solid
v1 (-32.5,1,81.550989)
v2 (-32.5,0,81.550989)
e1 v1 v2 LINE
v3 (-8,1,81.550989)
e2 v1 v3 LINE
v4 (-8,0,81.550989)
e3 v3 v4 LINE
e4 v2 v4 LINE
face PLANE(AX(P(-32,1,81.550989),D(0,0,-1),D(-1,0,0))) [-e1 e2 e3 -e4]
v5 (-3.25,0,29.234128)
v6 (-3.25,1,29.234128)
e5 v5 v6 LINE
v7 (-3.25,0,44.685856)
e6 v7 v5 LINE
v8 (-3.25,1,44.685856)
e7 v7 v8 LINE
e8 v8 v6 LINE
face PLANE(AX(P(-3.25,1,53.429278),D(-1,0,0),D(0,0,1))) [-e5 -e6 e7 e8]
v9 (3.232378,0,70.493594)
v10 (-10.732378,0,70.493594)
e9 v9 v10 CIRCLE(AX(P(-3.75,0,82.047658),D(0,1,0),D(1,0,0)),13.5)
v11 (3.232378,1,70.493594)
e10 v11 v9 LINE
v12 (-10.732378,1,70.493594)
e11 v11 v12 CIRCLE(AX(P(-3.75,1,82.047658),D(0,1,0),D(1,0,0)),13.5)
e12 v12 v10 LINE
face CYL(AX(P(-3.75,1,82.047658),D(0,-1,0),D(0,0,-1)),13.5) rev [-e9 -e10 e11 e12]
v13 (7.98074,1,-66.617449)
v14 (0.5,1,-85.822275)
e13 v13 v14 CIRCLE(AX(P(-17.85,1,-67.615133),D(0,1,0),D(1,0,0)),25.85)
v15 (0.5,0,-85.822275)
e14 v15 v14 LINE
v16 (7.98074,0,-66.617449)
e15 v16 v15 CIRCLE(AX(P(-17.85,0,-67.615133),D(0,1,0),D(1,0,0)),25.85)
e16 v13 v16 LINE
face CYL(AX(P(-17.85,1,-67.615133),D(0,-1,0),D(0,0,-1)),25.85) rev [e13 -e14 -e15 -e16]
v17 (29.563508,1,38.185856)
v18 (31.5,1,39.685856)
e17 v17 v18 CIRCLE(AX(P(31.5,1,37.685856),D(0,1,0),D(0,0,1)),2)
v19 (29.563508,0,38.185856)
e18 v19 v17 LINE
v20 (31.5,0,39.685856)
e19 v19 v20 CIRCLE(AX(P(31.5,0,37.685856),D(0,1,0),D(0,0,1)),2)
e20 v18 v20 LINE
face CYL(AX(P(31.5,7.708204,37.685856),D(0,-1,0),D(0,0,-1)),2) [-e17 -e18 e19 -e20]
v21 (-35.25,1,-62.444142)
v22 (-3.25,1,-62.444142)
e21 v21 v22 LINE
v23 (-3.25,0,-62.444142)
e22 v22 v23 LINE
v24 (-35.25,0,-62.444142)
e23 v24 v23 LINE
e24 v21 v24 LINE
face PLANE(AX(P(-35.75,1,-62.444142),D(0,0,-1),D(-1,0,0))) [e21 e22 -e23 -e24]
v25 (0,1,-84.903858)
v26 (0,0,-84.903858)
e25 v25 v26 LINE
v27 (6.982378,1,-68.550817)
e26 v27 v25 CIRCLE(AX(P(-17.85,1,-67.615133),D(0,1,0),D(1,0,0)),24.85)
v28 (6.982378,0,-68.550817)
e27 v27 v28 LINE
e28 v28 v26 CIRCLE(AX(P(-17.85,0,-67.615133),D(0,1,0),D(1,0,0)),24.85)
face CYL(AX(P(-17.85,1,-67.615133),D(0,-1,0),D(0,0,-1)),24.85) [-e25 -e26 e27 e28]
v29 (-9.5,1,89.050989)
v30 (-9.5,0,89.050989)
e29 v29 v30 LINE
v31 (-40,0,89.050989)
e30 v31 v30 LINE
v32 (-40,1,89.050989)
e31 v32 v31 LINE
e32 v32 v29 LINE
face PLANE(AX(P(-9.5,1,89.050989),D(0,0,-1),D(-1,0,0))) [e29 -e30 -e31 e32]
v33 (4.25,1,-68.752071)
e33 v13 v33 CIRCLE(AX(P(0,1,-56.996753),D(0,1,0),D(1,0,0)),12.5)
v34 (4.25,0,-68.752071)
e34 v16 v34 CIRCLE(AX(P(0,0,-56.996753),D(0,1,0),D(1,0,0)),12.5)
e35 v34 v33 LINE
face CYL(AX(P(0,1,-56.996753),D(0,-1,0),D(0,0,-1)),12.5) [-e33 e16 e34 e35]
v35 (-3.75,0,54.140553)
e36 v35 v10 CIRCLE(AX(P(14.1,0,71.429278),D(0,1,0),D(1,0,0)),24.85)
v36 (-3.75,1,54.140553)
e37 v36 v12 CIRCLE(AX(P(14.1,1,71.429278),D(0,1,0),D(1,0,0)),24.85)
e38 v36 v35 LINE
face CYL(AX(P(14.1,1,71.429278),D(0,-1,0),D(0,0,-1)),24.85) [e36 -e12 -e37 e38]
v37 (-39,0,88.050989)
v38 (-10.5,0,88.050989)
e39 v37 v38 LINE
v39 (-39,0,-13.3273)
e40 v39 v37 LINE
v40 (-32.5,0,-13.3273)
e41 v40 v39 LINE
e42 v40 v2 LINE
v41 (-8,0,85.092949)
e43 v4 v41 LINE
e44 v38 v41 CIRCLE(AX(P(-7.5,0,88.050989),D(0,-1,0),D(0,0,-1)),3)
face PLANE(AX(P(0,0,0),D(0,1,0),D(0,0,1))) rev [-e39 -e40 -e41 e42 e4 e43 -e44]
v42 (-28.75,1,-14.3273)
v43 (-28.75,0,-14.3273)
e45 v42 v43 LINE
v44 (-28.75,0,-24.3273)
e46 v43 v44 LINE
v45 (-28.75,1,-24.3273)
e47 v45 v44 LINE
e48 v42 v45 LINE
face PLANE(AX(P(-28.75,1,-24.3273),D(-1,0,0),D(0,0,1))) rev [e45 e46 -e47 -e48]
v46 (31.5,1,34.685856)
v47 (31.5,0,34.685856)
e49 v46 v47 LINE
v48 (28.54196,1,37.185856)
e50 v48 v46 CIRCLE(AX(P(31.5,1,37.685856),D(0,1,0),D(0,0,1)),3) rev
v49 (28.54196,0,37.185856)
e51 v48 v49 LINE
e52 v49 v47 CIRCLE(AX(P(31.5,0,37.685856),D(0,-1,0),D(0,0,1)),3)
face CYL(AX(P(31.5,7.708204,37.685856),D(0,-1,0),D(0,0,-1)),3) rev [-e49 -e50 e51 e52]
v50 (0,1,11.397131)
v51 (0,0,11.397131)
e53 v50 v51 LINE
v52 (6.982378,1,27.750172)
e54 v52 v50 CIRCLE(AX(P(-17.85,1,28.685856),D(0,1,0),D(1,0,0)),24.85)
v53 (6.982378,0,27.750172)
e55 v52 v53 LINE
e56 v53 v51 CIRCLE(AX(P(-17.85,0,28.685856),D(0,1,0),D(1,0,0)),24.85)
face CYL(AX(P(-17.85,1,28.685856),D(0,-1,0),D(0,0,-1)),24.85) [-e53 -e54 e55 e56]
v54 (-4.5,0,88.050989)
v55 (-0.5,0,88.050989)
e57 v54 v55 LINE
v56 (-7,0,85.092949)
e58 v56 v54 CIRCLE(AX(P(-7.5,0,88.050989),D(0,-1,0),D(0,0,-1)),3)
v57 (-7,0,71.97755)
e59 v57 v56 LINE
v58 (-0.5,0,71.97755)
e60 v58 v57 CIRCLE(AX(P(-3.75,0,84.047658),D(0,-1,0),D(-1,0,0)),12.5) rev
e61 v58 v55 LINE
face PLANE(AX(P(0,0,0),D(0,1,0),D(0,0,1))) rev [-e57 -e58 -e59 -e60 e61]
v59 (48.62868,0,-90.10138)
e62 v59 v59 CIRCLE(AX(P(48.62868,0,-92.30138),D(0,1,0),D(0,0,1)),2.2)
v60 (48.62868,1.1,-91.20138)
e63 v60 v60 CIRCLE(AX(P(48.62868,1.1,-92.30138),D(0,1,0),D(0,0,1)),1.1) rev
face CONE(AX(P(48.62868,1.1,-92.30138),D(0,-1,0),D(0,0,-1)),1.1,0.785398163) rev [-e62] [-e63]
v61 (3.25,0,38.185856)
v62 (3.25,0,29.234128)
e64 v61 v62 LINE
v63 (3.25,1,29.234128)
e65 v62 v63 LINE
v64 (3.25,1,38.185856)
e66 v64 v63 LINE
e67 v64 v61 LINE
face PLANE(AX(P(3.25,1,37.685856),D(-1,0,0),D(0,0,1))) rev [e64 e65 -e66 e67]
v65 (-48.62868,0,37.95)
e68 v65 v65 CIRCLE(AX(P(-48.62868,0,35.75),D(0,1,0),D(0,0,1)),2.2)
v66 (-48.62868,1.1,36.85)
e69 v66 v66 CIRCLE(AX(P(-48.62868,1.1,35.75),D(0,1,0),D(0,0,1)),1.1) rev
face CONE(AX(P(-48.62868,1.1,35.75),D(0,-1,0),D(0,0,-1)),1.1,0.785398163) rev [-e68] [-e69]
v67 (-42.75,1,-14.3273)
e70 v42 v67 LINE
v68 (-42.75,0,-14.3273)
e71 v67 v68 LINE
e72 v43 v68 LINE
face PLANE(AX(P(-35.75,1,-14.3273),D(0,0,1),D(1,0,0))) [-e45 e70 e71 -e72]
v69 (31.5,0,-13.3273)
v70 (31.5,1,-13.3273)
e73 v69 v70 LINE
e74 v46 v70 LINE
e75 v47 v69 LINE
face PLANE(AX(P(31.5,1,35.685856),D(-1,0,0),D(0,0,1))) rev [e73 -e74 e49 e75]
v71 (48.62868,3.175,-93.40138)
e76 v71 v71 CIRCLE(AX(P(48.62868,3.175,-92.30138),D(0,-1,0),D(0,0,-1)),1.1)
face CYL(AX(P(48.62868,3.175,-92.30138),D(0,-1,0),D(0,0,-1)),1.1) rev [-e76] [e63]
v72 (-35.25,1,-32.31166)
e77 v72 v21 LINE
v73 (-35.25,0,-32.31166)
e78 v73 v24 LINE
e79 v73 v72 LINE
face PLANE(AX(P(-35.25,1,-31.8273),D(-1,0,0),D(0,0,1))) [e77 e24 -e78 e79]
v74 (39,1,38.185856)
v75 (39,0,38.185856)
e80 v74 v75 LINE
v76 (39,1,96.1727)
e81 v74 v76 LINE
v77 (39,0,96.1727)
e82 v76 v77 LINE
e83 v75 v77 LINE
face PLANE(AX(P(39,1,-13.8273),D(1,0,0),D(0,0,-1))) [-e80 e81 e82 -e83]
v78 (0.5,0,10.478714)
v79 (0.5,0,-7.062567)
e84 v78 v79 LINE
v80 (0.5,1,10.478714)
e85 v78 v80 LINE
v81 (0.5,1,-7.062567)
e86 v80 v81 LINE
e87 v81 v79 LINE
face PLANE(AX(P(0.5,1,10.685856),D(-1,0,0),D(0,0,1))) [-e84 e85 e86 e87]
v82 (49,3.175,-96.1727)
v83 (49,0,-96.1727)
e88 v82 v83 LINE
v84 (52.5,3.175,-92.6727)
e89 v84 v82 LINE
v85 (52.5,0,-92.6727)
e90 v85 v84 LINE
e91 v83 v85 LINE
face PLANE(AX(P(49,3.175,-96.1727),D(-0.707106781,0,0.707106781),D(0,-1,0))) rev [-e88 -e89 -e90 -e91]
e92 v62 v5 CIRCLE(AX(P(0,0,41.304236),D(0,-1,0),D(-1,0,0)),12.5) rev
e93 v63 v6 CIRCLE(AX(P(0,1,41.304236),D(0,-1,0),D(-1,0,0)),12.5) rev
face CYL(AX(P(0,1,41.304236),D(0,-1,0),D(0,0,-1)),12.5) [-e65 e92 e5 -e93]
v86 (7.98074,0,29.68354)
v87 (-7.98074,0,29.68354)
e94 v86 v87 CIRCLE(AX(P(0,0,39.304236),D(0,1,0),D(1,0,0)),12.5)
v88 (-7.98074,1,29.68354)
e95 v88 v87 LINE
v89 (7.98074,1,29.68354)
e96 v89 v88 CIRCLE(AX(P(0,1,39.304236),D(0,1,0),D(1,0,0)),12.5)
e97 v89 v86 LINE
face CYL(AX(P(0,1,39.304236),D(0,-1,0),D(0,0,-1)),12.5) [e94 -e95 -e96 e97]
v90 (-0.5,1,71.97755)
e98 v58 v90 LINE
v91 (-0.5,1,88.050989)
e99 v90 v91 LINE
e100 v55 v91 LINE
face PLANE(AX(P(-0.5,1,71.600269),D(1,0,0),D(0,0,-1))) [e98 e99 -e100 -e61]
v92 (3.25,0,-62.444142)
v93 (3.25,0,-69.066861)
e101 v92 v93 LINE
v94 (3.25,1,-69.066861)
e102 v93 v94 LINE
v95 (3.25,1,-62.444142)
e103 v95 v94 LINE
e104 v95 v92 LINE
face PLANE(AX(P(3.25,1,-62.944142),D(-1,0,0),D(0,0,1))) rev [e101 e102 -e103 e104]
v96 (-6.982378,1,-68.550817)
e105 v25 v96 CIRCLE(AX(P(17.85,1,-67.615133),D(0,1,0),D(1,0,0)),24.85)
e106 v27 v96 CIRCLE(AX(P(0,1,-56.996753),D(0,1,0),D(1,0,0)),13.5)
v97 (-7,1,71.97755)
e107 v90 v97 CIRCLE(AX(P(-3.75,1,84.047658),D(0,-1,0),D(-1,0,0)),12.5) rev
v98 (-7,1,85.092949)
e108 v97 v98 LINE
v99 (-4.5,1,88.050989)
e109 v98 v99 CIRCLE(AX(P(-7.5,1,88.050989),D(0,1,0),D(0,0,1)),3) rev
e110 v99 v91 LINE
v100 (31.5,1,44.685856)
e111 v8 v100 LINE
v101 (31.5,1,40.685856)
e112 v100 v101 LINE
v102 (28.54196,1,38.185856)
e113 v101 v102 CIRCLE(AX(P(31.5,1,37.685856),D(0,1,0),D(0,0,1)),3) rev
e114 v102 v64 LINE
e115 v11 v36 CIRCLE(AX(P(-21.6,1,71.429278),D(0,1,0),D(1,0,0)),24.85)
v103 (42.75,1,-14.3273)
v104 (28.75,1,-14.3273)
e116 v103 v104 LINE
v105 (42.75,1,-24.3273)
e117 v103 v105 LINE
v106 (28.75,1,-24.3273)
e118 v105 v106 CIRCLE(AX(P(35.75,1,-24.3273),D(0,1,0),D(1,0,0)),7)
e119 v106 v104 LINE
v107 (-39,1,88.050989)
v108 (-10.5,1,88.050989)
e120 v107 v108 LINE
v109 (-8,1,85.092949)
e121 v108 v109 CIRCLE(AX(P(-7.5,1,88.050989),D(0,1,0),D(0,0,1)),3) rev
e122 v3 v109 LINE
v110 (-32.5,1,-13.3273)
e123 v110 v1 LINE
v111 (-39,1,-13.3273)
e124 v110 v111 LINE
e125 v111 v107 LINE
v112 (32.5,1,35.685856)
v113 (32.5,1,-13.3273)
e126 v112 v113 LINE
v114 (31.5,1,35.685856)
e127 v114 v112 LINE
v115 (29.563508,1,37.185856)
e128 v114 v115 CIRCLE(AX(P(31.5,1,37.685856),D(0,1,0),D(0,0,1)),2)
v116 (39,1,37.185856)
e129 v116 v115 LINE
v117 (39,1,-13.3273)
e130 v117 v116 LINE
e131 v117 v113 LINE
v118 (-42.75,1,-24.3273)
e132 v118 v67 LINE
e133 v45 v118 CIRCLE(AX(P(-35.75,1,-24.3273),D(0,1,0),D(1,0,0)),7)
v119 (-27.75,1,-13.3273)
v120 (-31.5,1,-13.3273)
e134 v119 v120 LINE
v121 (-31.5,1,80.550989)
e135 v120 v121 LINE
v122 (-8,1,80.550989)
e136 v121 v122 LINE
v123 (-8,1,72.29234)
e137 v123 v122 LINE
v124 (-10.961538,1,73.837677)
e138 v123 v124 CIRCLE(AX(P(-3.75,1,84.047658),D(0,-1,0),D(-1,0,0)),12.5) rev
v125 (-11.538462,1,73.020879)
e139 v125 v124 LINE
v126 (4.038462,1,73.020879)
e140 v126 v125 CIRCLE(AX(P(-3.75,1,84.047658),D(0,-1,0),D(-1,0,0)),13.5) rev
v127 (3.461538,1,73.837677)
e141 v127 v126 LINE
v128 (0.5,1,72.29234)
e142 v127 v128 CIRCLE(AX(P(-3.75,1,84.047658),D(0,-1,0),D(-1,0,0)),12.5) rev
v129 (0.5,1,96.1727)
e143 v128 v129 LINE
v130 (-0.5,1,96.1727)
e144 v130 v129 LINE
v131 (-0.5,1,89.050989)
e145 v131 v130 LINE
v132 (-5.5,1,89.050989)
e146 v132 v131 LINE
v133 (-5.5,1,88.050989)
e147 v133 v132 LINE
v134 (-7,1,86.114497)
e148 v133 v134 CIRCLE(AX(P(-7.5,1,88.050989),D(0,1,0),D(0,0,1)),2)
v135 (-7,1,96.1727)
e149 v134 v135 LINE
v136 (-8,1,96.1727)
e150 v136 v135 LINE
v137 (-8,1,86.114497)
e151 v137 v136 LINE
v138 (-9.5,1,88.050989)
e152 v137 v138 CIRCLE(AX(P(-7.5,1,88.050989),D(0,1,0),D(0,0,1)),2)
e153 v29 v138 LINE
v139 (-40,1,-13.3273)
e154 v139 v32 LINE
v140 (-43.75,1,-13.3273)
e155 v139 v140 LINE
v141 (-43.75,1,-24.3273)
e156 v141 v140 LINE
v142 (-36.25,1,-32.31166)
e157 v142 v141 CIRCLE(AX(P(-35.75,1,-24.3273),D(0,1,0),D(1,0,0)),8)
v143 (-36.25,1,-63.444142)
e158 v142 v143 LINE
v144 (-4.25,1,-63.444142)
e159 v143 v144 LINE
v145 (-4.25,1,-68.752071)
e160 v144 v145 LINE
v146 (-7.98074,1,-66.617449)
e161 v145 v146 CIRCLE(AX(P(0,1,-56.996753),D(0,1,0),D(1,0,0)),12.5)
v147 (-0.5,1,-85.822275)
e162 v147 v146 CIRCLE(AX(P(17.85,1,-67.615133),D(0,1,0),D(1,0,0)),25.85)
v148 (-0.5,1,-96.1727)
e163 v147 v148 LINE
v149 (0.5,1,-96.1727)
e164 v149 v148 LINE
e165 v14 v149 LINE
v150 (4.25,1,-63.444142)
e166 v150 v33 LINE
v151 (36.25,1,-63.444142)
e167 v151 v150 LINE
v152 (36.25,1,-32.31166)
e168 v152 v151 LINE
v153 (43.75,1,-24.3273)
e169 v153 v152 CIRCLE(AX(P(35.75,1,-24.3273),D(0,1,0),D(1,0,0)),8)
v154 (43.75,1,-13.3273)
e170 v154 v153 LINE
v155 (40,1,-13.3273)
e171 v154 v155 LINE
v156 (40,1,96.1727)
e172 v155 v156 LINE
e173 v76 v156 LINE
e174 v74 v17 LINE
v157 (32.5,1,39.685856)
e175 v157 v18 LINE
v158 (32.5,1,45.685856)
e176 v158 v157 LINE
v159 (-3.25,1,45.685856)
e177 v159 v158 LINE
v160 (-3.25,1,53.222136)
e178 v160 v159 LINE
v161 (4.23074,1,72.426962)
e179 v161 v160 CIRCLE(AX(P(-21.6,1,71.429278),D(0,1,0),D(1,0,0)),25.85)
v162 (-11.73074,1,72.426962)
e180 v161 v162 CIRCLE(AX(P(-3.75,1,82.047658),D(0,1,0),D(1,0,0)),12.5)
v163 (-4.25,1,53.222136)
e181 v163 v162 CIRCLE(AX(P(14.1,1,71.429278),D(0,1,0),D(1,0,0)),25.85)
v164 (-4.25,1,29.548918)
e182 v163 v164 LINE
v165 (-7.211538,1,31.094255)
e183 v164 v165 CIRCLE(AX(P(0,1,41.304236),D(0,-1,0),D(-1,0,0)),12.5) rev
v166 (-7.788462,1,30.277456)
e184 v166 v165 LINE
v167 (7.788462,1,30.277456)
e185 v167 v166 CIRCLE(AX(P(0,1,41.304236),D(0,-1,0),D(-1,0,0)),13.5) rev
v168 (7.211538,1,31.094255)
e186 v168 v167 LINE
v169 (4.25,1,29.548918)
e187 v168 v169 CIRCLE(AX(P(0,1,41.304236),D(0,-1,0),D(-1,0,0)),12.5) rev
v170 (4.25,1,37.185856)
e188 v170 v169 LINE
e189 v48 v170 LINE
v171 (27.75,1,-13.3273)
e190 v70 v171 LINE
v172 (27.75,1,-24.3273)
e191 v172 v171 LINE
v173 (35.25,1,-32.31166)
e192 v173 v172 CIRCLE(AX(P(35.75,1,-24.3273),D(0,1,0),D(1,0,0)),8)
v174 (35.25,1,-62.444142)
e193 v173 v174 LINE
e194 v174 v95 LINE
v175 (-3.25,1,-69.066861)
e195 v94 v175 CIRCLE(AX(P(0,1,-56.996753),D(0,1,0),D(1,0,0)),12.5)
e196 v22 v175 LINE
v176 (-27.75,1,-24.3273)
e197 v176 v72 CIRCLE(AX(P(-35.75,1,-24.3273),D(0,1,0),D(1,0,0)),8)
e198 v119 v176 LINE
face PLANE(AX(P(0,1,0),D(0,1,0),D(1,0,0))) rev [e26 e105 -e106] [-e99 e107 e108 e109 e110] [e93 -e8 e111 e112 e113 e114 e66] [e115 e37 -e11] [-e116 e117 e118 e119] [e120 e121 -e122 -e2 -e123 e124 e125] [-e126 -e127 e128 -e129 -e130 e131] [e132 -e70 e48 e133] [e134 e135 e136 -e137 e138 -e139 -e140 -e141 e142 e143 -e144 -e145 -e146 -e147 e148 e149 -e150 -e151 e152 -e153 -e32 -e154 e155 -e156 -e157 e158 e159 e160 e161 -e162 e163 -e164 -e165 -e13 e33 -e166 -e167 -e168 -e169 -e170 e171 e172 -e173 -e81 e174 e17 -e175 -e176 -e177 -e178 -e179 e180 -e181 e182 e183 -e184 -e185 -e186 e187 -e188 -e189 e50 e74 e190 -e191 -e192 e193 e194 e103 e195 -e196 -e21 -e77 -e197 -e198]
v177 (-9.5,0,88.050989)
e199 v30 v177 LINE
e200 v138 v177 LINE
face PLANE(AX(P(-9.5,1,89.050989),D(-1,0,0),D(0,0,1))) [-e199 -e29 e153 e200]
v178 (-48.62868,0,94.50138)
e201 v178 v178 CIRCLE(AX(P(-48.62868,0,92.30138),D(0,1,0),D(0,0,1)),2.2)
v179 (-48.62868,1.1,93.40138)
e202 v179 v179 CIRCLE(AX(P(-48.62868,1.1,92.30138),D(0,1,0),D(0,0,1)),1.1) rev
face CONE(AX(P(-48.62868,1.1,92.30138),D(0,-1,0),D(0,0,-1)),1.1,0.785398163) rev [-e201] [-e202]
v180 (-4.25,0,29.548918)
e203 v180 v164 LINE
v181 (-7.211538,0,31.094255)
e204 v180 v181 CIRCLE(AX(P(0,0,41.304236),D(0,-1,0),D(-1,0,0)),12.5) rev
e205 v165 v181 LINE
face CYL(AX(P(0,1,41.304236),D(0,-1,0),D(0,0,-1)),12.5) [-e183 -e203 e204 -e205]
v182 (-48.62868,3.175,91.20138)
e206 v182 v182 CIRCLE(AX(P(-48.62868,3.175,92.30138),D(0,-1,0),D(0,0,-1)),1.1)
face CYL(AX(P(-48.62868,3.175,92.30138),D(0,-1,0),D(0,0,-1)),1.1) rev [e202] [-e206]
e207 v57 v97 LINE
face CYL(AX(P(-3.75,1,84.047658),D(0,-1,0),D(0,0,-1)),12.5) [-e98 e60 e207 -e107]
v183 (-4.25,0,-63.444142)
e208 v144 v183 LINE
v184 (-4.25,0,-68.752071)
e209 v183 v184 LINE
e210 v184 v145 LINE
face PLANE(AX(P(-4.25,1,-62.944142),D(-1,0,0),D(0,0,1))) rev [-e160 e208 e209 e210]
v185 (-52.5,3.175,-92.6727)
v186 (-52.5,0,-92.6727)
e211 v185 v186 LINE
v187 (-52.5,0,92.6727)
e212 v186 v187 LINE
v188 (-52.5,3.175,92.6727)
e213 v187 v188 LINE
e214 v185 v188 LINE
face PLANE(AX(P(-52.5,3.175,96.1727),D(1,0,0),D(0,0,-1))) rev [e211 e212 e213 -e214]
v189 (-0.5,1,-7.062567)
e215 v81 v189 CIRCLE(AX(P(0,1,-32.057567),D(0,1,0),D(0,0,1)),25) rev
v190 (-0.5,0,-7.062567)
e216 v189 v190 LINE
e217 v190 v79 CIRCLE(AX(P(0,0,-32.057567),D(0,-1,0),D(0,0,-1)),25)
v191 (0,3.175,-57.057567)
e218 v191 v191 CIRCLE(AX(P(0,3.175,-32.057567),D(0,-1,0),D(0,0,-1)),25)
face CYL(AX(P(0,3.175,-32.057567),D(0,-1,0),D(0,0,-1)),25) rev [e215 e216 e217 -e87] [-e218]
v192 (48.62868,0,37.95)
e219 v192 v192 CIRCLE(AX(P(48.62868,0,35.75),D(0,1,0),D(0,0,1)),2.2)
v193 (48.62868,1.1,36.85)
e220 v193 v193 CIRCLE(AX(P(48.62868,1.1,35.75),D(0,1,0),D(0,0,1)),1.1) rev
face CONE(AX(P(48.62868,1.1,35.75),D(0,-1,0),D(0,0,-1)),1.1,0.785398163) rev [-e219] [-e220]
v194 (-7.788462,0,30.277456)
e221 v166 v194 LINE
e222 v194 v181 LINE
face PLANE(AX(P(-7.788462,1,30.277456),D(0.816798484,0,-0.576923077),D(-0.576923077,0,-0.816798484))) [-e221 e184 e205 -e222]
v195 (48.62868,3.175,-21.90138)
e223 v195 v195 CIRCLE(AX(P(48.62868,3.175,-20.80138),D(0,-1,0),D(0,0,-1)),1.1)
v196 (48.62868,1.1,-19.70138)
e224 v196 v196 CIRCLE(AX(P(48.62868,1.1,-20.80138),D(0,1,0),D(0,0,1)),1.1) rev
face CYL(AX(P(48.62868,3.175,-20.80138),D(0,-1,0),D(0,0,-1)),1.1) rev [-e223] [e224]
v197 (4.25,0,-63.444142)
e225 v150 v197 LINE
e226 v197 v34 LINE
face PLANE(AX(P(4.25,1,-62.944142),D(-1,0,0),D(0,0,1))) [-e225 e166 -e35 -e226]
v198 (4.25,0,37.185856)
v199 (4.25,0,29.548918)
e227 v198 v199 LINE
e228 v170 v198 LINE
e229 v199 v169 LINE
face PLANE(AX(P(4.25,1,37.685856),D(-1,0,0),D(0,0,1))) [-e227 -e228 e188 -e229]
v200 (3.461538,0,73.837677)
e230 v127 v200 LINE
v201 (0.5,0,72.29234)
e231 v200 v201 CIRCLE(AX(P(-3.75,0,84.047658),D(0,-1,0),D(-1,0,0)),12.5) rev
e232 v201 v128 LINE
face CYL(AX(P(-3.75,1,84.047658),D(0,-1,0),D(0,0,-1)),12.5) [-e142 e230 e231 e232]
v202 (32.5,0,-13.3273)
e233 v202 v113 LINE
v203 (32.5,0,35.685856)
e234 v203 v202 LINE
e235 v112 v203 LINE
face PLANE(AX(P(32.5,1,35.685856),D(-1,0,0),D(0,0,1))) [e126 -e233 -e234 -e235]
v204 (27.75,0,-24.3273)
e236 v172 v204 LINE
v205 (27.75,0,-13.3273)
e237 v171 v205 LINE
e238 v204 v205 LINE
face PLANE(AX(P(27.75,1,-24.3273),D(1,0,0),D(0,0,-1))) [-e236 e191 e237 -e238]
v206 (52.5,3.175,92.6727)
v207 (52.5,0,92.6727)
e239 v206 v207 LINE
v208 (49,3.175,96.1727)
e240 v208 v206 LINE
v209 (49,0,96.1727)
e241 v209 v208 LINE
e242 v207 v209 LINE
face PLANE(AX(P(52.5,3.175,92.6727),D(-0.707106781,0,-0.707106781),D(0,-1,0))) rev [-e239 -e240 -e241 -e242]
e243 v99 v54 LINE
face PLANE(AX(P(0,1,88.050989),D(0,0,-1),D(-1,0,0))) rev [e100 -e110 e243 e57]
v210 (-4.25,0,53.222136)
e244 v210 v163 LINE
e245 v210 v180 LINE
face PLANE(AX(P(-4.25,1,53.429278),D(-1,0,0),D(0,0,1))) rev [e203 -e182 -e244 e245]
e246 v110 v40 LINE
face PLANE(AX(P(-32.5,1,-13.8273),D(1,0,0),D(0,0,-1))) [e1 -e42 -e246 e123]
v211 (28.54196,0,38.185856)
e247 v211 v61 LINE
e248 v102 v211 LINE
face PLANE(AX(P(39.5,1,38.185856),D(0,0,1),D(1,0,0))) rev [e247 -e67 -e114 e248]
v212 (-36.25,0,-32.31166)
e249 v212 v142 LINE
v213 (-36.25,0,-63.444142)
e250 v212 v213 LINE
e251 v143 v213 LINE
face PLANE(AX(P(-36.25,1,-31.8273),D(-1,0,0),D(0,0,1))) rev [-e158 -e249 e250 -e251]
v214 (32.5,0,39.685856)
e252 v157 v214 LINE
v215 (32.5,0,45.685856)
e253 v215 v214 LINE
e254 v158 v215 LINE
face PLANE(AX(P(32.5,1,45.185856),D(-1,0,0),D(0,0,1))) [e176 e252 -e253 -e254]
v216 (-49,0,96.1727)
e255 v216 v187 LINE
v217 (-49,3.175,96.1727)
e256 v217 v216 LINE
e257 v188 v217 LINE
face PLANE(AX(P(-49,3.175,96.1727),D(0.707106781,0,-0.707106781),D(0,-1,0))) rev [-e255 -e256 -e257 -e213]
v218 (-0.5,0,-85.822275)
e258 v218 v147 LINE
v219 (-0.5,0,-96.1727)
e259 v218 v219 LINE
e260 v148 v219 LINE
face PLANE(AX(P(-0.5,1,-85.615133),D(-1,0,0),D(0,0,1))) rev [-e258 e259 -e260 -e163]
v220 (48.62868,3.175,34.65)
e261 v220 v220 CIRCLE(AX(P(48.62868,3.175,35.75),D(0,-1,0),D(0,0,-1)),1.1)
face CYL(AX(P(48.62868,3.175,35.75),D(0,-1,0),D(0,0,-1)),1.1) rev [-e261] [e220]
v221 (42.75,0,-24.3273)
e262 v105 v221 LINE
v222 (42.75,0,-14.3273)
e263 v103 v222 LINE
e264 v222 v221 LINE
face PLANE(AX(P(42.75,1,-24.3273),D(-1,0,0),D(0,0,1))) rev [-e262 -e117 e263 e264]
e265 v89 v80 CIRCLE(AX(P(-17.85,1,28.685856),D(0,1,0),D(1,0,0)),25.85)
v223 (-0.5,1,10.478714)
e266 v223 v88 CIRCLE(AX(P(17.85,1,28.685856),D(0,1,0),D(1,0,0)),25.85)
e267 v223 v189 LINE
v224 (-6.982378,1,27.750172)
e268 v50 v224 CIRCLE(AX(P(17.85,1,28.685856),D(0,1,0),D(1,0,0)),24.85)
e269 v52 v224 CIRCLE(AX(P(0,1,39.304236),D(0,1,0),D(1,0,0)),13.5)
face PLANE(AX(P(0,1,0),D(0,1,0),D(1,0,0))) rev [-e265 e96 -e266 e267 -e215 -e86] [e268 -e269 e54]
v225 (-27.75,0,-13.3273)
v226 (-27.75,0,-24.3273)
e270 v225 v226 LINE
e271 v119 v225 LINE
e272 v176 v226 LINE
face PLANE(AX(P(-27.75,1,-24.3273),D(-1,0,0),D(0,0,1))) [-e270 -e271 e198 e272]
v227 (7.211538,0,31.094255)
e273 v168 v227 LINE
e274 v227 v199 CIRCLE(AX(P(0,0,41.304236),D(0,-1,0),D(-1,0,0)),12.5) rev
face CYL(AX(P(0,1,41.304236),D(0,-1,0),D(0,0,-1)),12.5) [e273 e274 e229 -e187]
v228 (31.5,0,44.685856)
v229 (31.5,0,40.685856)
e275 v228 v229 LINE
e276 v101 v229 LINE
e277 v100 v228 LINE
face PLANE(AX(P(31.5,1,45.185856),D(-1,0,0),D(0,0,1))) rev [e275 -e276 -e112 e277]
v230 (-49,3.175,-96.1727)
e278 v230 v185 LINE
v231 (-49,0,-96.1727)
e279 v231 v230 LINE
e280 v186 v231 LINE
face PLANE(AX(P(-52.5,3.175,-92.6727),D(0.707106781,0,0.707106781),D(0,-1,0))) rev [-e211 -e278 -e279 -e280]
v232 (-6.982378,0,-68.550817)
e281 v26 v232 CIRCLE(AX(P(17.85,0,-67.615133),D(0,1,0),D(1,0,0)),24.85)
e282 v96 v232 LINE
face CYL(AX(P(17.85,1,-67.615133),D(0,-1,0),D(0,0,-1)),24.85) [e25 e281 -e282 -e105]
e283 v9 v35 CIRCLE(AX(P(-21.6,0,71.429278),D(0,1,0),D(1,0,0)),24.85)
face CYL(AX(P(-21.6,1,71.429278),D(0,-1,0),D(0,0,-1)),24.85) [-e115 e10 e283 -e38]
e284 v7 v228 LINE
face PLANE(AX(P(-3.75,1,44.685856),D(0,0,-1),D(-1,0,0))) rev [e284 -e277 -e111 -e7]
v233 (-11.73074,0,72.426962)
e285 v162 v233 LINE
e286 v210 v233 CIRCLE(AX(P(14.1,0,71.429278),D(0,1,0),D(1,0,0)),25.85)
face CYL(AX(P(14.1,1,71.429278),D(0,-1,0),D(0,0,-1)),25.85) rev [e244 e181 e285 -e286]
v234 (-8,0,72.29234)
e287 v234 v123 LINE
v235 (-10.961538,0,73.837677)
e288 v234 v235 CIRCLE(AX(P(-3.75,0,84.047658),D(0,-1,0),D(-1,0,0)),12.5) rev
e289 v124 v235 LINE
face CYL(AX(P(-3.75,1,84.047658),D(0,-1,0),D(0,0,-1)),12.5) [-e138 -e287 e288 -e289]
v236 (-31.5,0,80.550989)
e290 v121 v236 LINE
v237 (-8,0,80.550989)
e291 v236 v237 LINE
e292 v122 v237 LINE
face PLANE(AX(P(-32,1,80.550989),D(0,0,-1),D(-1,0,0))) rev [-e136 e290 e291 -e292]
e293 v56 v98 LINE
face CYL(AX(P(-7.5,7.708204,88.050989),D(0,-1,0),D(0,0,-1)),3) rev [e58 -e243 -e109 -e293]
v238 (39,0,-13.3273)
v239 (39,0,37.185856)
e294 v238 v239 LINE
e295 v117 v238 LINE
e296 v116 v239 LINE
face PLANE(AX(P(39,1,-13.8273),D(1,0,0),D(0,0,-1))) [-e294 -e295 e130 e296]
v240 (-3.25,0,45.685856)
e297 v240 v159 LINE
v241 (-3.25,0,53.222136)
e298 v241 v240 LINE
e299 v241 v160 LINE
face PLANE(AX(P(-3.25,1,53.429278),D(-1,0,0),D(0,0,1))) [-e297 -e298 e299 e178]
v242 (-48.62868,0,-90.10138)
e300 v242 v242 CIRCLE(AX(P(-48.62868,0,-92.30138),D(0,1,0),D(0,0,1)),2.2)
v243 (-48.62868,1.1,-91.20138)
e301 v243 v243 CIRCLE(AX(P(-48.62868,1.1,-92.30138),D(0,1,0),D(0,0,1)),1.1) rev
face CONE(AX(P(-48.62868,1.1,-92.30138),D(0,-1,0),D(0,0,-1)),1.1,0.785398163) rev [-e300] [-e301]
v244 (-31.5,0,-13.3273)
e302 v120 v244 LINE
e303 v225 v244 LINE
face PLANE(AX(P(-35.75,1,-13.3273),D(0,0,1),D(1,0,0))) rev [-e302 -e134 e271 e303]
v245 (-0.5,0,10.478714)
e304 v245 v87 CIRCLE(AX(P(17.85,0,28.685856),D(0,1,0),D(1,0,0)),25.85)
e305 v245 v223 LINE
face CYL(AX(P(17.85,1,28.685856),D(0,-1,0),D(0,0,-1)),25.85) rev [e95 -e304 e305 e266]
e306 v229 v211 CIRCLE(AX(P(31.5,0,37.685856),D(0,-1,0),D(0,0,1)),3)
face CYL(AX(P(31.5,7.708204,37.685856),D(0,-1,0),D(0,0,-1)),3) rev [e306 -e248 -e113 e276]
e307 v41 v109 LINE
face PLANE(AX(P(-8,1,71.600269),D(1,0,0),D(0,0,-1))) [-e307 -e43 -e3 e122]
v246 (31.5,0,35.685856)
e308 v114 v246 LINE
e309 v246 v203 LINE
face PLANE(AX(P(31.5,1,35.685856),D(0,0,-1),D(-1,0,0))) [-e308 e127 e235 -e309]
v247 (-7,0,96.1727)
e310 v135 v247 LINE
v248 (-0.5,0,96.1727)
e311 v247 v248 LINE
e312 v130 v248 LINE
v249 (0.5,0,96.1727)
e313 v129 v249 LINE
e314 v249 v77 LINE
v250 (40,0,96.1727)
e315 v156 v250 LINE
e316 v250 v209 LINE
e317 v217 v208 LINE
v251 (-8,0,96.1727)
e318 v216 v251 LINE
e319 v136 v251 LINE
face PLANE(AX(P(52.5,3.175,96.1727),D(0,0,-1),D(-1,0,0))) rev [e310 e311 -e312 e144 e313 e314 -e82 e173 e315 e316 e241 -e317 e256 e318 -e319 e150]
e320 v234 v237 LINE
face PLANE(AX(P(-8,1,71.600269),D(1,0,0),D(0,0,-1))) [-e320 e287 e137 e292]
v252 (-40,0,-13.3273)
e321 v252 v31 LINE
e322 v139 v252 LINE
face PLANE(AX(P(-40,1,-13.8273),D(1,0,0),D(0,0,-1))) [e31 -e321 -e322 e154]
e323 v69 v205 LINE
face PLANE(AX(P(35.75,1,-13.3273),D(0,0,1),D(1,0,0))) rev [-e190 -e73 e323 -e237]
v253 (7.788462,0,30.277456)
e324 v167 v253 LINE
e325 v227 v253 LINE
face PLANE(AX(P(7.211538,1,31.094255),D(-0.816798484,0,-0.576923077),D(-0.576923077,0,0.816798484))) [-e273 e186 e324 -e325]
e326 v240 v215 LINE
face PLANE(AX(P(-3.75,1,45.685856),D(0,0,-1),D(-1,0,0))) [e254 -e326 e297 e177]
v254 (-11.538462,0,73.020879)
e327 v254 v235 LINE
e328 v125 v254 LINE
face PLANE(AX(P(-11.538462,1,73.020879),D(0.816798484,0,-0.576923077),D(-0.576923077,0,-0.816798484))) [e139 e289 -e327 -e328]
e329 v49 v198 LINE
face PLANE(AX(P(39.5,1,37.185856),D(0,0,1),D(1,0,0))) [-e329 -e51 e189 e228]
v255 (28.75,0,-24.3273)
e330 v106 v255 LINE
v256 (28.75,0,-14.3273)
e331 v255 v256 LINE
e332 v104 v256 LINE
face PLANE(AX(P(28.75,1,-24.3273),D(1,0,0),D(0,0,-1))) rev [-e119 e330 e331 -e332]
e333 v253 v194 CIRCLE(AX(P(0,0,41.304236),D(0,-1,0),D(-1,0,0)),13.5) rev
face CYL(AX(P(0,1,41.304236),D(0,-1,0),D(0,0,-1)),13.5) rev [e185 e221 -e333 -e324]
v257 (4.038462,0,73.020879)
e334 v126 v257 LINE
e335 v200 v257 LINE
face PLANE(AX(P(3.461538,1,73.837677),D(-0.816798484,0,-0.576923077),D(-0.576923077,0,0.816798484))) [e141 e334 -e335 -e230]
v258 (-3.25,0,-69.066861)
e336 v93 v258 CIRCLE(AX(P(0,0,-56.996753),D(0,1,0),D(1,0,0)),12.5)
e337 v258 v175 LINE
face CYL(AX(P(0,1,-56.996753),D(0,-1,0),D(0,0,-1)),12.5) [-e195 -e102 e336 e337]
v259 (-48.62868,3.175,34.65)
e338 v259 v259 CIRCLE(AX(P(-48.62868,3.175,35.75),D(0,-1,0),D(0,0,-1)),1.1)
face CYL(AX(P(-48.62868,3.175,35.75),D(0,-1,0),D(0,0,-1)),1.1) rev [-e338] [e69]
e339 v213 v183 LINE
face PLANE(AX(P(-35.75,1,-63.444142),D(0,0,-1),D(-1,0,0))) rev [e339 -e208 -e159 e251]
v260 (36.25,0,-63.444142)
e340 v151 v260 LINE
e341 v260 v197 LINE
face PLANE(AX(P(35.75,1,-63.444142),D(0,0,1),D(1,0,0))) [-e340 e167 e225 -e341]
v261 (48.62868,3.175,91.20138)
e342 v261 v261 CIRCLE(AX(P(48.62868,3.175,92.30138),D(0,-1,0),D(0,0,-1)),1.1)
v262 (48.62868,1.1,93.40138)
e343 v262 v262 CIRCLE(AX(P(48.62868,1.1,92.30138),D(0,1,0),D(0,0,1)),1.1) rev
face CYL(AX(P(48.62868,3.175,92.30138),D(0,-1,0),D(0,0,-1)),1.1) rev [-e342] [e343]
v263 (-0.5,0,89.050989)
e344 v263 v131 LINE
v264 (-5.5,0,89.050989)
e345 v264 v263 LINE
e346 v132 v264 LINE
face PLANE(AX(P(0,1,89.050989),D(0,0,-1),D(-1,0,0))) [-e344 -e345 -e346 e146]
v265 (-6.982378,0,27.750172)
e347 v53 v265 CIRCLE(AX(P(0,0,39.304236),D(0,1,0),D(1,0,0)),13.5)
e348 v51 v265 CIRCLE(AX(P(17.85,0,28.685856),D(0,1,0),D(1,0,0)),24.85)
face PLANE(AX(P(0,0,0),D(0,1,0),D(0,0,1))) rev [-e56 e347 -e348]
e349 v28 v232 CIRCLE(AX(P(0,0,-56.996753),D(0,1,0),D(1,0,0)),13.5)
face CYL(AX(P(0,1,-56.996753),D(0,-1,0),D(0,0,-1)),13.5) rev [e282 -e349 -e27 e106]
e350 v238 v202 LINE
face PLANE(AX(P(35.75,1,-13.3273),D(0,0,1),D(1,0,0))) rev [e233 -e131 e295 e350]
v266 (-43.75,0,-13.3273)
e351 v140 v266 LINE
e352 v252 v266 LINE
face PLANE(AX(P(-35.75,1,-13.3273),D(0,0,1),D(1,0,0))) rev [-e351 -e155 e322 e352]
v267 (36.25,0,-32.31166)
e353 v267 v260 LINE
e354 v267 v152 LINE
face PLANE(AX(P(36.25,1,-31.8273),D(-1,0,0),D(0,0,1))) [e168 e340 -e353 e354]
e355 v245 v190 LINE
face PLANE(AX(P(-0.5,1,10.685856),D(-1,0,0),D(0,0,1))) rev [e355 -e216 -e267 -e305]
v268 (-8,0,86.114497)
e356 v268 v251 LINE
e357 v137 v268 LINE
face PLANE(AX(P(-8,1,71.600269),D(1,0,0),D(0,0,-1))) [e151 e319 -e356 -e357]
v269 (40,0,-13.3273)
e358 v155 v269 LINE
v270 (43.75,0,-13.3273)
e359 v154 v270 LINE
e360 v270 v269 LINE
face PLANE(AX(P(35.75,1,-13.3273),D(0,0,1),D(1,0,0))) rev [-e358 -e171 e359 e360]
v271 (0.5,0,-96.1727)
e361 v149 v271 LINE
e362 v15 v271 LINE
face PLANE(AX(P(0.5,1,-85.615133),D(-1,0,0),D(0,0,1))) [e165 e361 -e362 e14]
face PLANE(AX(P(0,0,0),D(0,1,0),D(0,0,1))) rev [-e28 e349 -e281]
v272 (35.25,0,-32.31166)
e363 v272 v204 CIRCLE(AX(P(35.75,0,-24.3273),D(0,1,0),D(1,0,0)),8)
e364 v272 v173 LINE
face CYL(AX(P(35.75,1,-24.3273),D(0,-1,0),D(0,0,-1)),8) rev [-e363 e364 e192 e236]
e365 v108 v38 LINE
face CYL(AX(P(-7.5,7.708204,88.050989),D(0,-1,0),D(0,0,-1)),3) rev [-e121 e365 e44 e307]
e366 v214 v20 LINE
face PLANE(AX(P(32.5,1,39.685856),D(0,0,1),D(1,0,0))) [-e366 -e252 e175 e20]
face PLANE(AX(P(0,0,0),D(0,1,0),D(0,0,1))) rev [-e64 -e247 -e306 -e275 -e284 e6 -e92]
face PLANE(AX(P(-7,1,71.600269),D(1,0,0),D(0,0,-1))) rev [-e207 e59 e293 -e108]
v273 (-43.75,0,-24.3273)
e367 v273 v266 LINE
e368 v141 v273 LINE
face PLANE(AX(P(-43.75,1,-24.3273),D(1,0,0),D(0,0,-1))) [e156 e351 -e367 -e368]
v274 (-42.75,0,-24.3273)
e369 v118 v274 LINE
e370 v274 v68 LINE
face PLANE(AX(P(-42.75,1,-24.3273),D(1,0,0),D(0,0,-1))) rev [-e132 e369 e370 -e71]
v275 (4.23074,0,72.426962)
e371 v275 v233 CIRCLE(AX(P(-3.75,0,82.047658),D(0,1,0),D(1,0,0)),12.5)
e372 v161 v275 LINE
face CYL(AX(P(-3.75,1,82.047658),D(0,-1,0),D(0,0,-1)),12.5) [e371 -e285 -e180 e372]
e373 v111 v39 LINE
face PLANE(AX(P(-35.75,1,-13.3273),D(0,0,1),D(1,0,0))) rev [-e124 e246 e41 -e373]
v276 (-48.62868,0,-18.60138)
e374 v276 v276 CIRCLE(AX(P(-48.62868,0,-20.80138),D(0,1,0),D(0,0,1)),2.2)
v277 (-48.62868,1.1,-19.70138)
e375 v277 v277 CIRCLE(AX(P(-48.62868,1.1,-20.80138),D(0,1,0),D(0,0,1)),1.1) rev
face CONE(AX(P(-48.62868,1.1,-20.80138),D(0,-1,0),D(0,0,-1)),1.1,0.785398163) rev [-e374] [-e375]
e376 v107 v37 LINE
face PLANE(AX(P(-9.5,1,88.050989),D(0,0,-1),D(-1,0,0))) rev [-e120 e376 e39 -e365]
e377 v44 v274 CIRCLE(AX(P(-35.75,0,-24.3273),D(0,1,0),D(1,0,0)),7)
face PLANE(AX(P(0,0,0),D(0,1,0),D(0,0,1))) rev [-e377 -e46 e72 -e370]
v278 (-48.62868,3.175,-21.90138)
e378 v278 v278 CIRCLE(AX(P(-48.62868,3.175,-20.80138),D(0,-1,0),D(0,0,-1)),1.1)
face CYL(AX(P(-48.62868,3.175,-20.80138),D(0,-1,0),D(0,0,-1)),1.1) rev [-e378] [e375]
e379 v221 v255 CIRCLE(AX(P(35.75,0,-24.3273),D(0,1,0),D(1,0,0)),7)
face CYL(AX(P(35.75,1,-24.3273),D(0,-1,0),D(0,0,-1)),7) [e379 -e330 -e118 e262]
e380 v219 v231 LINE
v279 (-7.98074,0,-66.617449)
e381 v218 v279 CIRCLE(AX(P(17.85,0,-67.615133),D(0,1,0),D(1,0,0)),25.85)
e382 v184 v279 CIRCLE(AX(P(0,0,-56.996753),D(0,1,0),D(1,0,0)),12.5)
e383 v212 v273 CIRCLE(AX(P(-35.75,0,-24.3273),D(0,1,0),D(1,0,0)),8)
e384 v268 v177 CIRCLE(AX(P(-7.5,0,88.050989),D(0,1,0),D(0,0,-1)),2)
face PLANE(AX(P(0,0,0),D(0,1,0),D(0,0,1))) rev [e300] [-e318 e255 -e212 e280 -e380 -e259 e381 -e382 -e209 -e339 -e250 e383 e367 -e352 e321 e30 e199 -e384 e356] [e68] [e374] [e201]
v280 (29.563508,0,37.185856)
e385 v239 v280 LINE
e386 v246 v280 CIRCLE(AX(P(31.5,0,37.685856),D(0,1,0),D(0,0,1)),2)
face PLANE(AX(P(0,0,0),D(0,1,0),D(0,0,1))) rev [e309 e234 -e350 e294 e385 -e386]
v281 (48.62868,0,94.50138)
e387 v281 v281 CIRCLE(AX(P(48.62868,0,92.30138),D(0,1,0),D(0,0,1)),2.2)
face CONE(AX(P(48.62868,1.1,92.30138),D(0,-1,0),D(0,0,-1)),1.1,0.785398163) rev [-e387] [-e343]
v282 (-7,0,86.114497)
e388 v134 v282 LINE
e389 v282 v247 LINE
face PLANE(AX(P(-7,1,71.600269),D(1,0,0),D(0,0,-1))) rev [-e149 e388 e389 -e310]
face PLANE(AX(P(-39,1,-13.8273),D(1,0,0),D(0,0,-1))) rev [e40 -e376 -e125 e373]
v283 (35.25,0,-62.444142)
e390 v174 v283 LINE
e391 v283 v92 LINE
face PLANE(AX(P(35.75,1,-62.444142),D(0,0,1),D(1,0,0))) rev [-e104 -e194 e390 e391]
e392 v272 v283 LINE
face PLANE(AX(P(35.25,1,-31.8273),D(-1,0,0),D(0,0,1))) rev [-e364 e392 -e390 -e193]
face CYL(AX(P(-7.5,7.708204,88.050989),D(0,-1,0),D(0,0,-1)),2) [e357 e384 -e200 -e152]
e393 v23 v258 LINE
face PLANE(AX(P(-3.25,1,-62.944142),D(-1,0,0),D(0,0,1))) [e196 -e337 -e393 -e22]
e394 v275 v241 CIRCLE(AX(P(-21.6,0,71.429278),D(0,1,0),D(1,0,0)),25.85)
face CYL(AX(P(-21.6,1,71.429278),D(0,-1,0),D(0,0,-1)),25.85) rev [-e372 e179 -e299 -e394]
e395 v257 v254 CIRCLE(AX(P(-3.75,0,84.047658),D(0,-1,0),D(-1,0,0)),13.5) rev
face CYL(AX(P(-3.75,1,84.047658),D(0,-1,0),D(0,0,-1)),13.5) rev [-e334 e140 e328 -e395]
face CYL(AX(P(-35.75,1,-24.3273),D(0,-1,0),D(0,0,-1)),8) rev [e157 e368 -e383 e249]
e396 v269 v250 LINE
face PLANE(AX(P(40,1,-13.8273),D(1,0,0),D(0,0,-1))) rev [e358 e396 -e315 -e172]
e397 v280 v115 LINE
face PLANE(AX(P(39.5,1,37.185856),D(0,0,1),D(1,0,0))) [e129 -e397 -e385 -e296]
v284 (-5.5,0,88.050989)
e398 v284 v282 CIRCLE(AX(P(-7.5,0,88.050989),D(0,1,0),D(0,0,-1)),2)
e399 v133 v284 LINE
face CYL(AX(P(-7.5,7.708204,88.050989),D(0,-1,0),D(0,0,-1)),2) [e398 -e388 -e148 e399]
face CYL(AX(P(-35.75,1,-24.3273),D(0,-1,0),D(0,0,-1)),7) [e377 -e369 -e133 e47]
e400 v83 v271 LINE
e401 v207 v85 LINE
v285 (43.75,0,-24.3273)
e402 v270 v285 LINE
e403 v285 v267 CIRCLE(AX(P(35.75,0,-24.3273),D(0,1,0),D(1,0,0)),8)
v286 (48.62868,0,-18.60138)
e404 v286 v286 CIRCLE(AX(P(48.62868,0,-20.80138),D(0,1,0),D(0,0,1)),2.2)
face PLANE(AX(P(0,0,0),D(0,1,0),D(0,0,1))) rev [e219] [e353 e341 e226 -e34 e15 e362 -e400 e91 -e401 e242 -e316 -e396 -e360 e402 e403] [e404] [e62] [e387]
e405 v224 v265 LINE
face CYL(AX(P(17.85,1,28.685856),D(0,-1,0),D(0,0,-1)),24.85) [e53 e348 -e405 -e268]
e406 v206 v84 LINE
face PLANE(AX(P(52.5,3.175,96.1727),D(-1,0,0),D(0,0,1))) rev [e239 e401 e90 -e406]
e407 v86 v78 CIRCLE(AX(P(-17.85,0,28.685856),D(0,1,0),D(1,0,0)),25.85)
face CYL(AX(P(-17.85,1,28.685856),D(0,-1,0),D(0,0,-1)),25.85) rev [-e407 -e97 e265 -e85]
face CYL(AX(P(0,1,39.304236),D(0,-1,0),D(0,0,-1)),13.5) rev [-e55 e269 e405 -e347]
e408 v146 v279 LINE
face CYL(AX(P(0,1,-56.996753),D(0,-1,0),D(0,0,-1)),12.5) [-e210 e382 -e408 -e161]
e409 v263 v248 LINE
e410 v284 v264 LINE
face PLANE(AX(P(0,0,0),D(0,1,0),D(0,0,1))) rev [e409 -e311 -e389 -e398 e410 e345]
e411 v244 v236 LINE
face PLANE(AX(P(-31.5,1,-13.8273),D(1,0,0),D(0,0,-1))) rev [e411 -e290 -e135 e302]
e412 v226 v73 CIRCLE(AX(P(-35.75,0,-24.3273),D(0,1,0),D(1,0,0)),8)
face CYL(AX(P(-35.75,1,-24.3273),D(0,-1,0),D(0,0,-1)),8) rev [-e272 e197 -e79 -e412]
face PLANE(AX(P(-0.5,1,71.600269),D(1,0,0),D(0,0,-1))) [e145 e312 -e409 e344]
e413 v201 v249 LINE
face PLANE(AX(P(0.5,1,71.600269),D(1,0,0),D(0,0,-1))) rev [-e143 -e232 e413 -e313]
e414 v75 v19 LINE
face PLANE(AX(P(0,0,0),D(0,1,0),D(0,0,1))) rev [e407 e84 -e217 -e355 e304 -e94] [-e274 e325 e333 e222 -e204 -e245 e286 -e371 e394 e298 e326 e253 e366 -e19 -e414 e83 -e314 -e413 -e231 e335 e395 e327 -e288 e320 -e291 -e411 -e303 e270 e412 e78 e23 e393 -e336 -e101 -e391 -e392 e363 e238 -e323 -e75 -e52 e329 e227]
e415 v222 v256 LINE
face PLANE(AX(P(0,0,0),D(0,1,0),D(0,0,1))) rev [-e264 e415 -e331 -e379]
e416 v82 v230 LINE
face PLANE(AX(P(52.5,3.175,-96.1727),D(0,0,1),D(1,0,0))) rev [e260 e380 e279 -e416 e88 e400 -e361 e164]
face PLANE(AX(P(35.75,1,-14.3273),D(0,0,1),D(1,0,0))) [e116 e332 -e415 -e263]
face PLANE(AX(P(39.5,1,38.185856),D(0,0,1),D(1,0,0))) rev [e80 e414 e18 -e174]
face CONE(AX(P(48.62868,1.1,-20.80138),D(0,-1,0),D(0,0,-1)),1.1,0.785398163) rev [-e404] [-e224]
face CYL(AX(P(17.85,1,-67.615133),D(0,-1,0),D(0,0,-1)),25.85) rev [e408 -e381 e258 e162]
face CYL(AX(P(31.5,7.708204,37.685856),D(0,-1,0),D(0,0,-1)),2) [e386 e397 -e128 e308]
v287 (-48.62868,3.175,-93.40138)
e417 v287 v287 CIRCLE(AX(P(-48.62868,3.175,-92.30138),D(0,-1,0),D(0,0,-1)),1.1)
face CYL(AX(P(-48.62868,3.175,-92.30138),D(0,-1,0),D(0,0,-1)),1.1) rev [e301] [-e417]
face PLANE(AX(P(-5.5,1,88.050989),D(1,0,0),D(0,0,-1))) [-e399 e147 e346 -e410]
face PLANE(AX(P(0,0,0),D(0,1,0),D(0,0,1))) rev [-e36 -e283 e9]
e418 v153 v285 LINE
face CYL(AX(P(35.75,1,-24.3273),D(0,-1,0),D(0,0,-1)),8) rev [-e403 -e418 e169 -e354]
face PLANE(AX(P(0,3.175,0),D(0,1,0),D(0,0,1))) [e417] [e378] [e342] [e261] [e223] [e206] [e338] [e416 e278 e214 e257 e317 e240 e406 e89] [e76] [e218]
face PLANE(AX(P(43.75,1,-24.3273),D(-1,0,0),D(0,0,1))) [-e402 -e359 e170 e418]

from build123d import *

# Parameters (mm, degrees)
SKETCH1_W               = 105
SKETCH1_H               = 192.3454
BOSS_EXTRUDE1_DEPTH     = 3.175
CHAMFER1_SIZE           = 3.5
SKETCH2_R               = 25
CUT_EXTRUDE1_DEPTH      = 110.615322151
CUT_EXTRUDE_THIN1_START = -1
CUT_EXTRUDE_THIN1_DEPTH = 1
CUT_EXTRUDE2_DEPTH      = 1
SKETCH6_R               = 1.1
CUT_EXTRUDE3_DEPTH      = 110.615322151
CHAMFER2_SIZE           = 1.1


# Read off the part's stored shape, not the designer's step: Cut-Extrude-Thin1
with BuildPart() as part:
    # Sketch1 → Boss-Extrude1 (new body)
    with BuildSketch(Plane(origin=(0, 0, 0), x_dir=(1, 0, 0), z_dir=(0, 1, 0))):
        Rectangle(SKETCH1_W, SKETCH1_H)
    extrude(amount=BOSS_EXTRUDE1_DEPTH)

    # Chamfer1
    chamfer1_edges = [part.edges().sort_by_distance(p)[0] for p in [
        (-52.5, 1.5875, -96.1727),
        (52.5, 1.5875, -96.1727),
        (52.5, 1.5875, 96.1727),
        (-52.5, 1.5875, 96.1727),
    ]]
    chamfer(chamfer1_edges, length=CHAMFER1_SIZE)

    # Sketch2 → Cut-Extrude1 (cut, through all)
    with BuildSketch(Plane.XZ):
        with Locations(Location((0, -32.057566667, 0), (0, 0, 270))):
            Circle(SKETCH2_R)
    extrude(amount=-CUT_EXTRUDE1_DEPTH, mode=Mode.SUBTRACT)

    # Cut-Extrude-Thin1 outline → Cut-Extrude-Thin1 (cut)
    # profile 1 of 2: a face of its own
    with BuildSketch(Plane(origin=(0, 0, 0), x_dir=(-1, 0, 0), z_dir=(0, -1, 0)).offset(CUT_EXTRUDE_THIN1_START)):
        with BuildLine():
            Line((-0.5, 7.062567167), (-0.5, -10.4787141))
            ThreePointArc((-0.5, -10.4787141), (-6.237149669, -19.303333464), (-7.980739941, -29.683539926))
            ThreePointArc((-7.980739941, -29.683539926), (0, -26.804235846), (7.980739941, -29.683539926))
            ThreePointArc((7.980739941, -29.683539926), (6.237149669, -19.303333464), (0.5, -10.4787141))
            Line((0.5, -10.4787141), (0.5, 7.062567167))
            ThreePointArc((0.5, 7.062567167), (0, 7.057566667), (-0.5, 7.062567167))
        make_face()
        with BuildLine():
            ThreePointArc((0, -11.397130906), (5.003923805, -18.927747814), (6.982377972, -27.750171719))
            ThreePointArc((6.982377972, -27.750171719), (0, -25.804235846), (-6.982377972, -27.750171719))
            ThreePointArc((-6.982377972, -27.750171719), (-5.003923805, -18.927747814), (0, -11.397130906))
        make_face(mode=Mode.SUBTRACT)
    # profile 2 of 2: a face of its own
    with BuildSketch(Plane(origin=(0, 0, 0), x_dir=(-1, 0, 0), z_dir=(0, -1, 0)).offset(CUT_EXTRUDE_THIN1_START)):
        with BuildLine():
            ThreePointArc((-3.461538462, -73.83767702), (-2.032623324, -72.965633547), (-0.5, -72.292340123))
            Line((-0.5, -72.292340123), (-0.5, -96.1727))
            Line((-0.5, -96.1727), (0.5, -96.1727))
            Line((0.5, -96.1727), (0.5, -89.050988889))
            Line((0.5, -89.050988889), (5.5, -89.050988889))
            Line((5.5, -89.050988889), (5.5, -88.050988889))
            Line((5.5, -88.050988889), (0.5, -88.050988889))
            Line((0.5, -88.050988889), (0.5, -71.977550364))
            ThreePointArc((0.5, -71.977550364), (3.75, -71.547658069), (7, -71.977550364))
            Line((7, -71.977550364), (7, -96.1727))
            Line((7, -96.1727), (8, -96.1727))
            Line((8, -96.1727), (8, -81.550988889))
            Line((8, -81.550988889), (32.5, -81.550988889))
            Line((32.5, -81.550988889), (32.5, 13.3273))
            Line((32.5, 13.3273), (39, 13.3273))
            Line((39, 13.3273), (39, -88.050988889))
            Line((39, -88.050988889), (9.5, -88.050988889))
            Line((9.5, -88.050988889), (9.5, -89.050988889))
            Line((9.5, -89.050988889), (40, -89.050988889))
            Line((40, -89.050988889), (40, 13.3273))
            Line((40, 13.3273), (43.75, 13.3273))
            Line((43.75, 13.3273), (43.75, 24.3273))
            ThreePointArc((43.75, 24.3273), (41.580951895, 29.804525575), (36.25, 32.311659711))
            Line((36.25, 32.311659711), (36.25, 63.444142327))
            Line((36.25, 63.444142327), (4.25, 63.444142327))
            Line((4.25, 63.444142327), (4.25, 68.752070988))
            ThreePointArc((4.25, 68.752070988), (6.207809813, 67.846319731), (7.980739941, 66.617448963))
            ThreePointArc((7.980739941, 66.617448963), (6.237149669, 76.997655425), (0.5, 85.822274789))
            Line((0.5, 85.822274789), (0.5, 96.1727))
            Line((0.5, 96.1727), (-0.5, 96.1727))
            Line((-0.5, 96.1727), (-0.5, 85.822274789))
            ThreePointArc((-0.5, 85.822274789), (-6.237149669, 76.997655425), (-7.980739941, 66.617448963))
            ThreePointArc((-7.980739941, 66.617448963), (-6.207809813, 67.846319731), (-4.25, 68.752070988))
            Line((-4.25, 68.752070988), (-4.25, 63.444142327))
            Line((-4.25, 63.444142327), (-36.25, 63.444142327))
            Line((-36.25, 63.444142327), (-36.25, 32.311659711))
            ThreePointArc((-36.25, 32.311659711), (-41.580951895, 29.804525575), (-43.75, 24.3273))
            Line((-43.75, 24.3273), (-43.75, 13.3273))
            Line((-43.75, 13.3273), (-40, 13.3273))
            Line((-40, 13.3273), (-40, -96.1727))
            Line((-40, -96.1727), (-39, -96.1727))
            Line((-39, -96.1727), (-39, -38.185855556))
            Line((-39, -38.185855556), (-3.25, -38.185855556))
            Line((-3.25, -38.185855556), (-3.25, -29.234128142))
            ThreePointArc((-3.25, -29.234128142), (0, -28.804235846), (3.25, -29.234128142))
            Line((3.25, -29.234128142), (3.25, -44.685855556))
            Line((3.25, -44.685855556), (-31.5, -44.685855556))
            Line((-31.5, -44.685855556), (-31.5, -39.685855556))
            Line((-31.5, -39.685855556), (-32.5, -39.685855556))
            Line((-32.5, -39.685855556), (-32.5, -45.685855556))
            Line((-32.5, -45.685855556), (3.25, -45.685855556))
            Line((3.25, -45.685855556), (3.25, -53.222136322))
            ThreePointArc((3.25, -53.222136322), (-2.487149669, -62.046755686), (-4.230739941, -72.426962148))
            ThreePointArc((-4.230739941, -72.426962148), (3.75, -69.547658069), (11.730739941, -72.426962148))
            ThreePointArc((11.730739941, -72.426962148), (9.987149669, -62.046755686), (4.25, -53.222136322))
            Line((4.25, -53.222136322), (4.25, -29.548917901))
            ThreePointArc((4.25, -29.548917901), (5.782623324, -30.222211325), (7.211538462, -31.094254798))
            Line((7.211538462, -31.094254798), (7.788461538, -30.277456314))
            ThreePointArc((7.788461538, -30.277456314), (0, -27.804235846), (-7.788461538, -30.277456314))
            Line((-7.788461538, -30.277456314), (-7.211538462, -31.094254798))
            ThreePointArc((-7.211538462, -31.094254798), (-5.782623324, -30.222211325), (-4.25, -29.548917901))
            Line((-4.25, -29.548917901), (-4.25, -37.185855556))
            Line((-4.25, -37.185855556), (-39, -37.185855556))
            Line((-39, -37.185855556), (-39, 13.3273))
            Line((-39, 13.3273), (-32.5, 13.3273))
            Line((-32.5, 13.3273), (-32.5, -35.685855556))
            Line((-32.5, -35.685855556), (-31.5, -35.685855556))
            Line((-31.5, -35.685855556), (-31.5, 13.3273))
            Line((-31.5, 13.3273), (-27.75, 13.3273))
            Line((-27.75, 13.3273), (-27.75, 24.3273))
            ThreePointArc((-27.75, 24.3273), (-29.919048105, 29.804525575), (-35.25, 32.311659711))
            Line((-35.25, 32.311659711), (-35.25, 62.444142327))
            Line((-35.25, 62.444142327), (-3.25, 62.444142327))
            Line((-3.25, 62.444142327), (-3.25, 69.066860747))
            ThreePointArc((-3.25, 69.066860747), (0, 69.496753043), (3.25, 69.066860747))
            Line((3.25, 69.066860747), (3.25, 62.444142327))
            Line((3.25, 62.444142327), (35.25, 62.444142327))
            Line((35.25, 62.444142327), (35.25, 32.311659711))
            ThreePointArc((35.25, 32.311659711), (29.919048105, 29.804525575), (27.75, 24.3273))
            Line((27.75, 24.3273), (27.75, 13.3273))
            Line((27.75, 13.3273), (31.5, 13.3273))
            Line((31.5, 13.3273), (31.5, -80.550988889))
            Line((31.5, -80.550988889), (8, -80.550988889))
            Line((8, -80.550988889), (8, -72.292340123))
            ThreePointArc((8, -72.292340123), (9.532623324, -72.965633547), (10.961538462, -73.83767702))
            Line((10.961538462, -73.83767702), (11.538461538, -73.020878536))
            ThreePointArc((11.538461538, -73.020878536), (3.75, -70.547658069), (-4.038461538, -73.020878536))
            Line((-4.038461538, -73.020878536), (-3.461538462, -73.83767702))
        make_face()
        with BuildLine():
            ThreePointArc((3.75, -54.140553128), (8.753923805, -61.671170036), (10.732377972, -70.493593942))
            ThreePointArc((10.732377972, -70.493593942), (3.75, -68.547658069), (-3.232377972, -70.493593942))
            ThreePointArc((-3.232377972, -70.493593942), (-1.253923805, -61.671170036), (3.75, -54.140553128))
        make_face(mode=Mode.SUBTRACT)
        with BuildLine():
            Line((-28.75, 14.3273), (-42.75, 14.3273))
            Line((-42.75, 14.3273), (-42.75, 24.3273))
            ThreePointArc((-42.75, 24.3273), (-35.75, 31.3273), (-28.75, 24.3273))
            Line((-28.75, 24.3273), (-28.75, 14.3273))
        make_face(mode=Mode.SUBTRACT)
        with BuildLine():
            ThreePointArc((28.75, 24.3273), (35.75, 31.3273), (42.75, 24.3273))
            Line((42.75, 24.3273), (42.75, 14.3273))
            Line((42.75, 14.3273), (28.75, 14.3273))
            Line((28.75, 14.3273), (28.75, 24.3273))
        make_face(mode=Mode.SUBTRACT)
        with BuildLine():
            ThreePointArc((0, 84.903857983), (5.003923805, 77.373241075), (6.982377972, 68.55081717))
            ThreePointArc((6.982377972, 68.55081717), (0, 70.496753043), (-6.982377972, 68.55081717))
            ThreePointArc((-6.982377972, 68.55081717), (-5.003923805, 77.373241075), (0, 84.903857983))
        make_face(mode=Mode.SUBTRACT)
    extrude(amount=CUT_EXTRUDE_THIN1_DEPTH, mode=Mode.SUBTRACT)

    # Sketch4 → Cut-Extrude2 (cut)
    with BuildSketch(Plane.XZ):
        with BuildLine():
            Line((-10.5, 88.050988889), (-9.5, 88.050988889))
            ThreePointArc((-9.5, 88.050988889), (-7.5, 86.050988889), (-5.5, 88.050988889))
            Line((-5.5, 88.050988889), (-4.5, 88.050988889))
            ThreePointArc((-4.5, 88.050988889), (-7.5, 85.050988889), (-10.5, 88.050988889))
        make_face()
        with BuildLine():
            Line((31.5, 35.685855556), (31.5, 34.685855556))
            ThreePointArc((31.5, 34.685855556), (28.5, 37.685855556), (31.5, 40.685855556))
            Line((31.5, 40.685855556), (31.5, 39.685855556))
            ThreePointArc((31.5, 39.685855556), (29.5, 37.685855556), (31.5, 35.685855556))
        make_face()
    extrude(amount=-CUT_EXTRUDE2_DEPTH, mode=Mode.SUBTRACT)

    # Sketch6 → Cut-Extrude3 (cut, through all)
    with BuildSketch(Plane.XZ):
        with Locations(Location((48.628679656, -20.801379656, 0), (0, 0, 270))):
            Circle(SKETCH6_R)
        with Locations(Location((-48.628679656, 92.301379656, 0), (0, 0, 270))):
            Circle(SKETCH6_R)
        with Locations(Location((-48.628679656, 35.75, 0), (0, 0, 270))):
            Circle(SKETCH6_R)
        with Locations(Location((-48.628679656, -20.801379656, 0), (0, 0, 270))):
            Circle(SKETCH6_R)
        with Locations(Location((-48.628679656, -92.301379656, 0), (0, 0, 270))):
            Circle(SKETCH6_R)
        with Locations(Location((48.628679656, -92.301379656, 0), (0, 0, 270))):
            Circle(SKETCH6_R)
        with Locations(Location((48.628679656, 35.75, 0), (0, 0, 270))):
            Circle(SKETCH6_R)
        with Locations(Location((48.628679656, 92.301379656, 0), (0, 0, 270))):
            Circle(SKETCH6_R)
    extrude(amount=-CUT_EXTRUDE3_DEPTH, mode=Mode.SUBTRACT)

    # Chamfer2
    chamfer2_edges = [part.edges().sort_by_distance(p)[0] for p in [
        (48.628679656, 0, 93.401379656),
        (48.628679656, 0, 36.85),
        (48.628679656, 0, -91.201379656),
        (-48.628679656, 0, -91.201379656),
        (-48.628679656, 0, -19.701379656),
        (-48.628679656, 0, 36.85),
        (-48.628679656, 0, 93.401379656),
        (48.628679656, 0, -19.701379656),
    ]]
    chamfer(chamfer2_edges, length=CHAMFER2_SIZE)


solid = part.part
